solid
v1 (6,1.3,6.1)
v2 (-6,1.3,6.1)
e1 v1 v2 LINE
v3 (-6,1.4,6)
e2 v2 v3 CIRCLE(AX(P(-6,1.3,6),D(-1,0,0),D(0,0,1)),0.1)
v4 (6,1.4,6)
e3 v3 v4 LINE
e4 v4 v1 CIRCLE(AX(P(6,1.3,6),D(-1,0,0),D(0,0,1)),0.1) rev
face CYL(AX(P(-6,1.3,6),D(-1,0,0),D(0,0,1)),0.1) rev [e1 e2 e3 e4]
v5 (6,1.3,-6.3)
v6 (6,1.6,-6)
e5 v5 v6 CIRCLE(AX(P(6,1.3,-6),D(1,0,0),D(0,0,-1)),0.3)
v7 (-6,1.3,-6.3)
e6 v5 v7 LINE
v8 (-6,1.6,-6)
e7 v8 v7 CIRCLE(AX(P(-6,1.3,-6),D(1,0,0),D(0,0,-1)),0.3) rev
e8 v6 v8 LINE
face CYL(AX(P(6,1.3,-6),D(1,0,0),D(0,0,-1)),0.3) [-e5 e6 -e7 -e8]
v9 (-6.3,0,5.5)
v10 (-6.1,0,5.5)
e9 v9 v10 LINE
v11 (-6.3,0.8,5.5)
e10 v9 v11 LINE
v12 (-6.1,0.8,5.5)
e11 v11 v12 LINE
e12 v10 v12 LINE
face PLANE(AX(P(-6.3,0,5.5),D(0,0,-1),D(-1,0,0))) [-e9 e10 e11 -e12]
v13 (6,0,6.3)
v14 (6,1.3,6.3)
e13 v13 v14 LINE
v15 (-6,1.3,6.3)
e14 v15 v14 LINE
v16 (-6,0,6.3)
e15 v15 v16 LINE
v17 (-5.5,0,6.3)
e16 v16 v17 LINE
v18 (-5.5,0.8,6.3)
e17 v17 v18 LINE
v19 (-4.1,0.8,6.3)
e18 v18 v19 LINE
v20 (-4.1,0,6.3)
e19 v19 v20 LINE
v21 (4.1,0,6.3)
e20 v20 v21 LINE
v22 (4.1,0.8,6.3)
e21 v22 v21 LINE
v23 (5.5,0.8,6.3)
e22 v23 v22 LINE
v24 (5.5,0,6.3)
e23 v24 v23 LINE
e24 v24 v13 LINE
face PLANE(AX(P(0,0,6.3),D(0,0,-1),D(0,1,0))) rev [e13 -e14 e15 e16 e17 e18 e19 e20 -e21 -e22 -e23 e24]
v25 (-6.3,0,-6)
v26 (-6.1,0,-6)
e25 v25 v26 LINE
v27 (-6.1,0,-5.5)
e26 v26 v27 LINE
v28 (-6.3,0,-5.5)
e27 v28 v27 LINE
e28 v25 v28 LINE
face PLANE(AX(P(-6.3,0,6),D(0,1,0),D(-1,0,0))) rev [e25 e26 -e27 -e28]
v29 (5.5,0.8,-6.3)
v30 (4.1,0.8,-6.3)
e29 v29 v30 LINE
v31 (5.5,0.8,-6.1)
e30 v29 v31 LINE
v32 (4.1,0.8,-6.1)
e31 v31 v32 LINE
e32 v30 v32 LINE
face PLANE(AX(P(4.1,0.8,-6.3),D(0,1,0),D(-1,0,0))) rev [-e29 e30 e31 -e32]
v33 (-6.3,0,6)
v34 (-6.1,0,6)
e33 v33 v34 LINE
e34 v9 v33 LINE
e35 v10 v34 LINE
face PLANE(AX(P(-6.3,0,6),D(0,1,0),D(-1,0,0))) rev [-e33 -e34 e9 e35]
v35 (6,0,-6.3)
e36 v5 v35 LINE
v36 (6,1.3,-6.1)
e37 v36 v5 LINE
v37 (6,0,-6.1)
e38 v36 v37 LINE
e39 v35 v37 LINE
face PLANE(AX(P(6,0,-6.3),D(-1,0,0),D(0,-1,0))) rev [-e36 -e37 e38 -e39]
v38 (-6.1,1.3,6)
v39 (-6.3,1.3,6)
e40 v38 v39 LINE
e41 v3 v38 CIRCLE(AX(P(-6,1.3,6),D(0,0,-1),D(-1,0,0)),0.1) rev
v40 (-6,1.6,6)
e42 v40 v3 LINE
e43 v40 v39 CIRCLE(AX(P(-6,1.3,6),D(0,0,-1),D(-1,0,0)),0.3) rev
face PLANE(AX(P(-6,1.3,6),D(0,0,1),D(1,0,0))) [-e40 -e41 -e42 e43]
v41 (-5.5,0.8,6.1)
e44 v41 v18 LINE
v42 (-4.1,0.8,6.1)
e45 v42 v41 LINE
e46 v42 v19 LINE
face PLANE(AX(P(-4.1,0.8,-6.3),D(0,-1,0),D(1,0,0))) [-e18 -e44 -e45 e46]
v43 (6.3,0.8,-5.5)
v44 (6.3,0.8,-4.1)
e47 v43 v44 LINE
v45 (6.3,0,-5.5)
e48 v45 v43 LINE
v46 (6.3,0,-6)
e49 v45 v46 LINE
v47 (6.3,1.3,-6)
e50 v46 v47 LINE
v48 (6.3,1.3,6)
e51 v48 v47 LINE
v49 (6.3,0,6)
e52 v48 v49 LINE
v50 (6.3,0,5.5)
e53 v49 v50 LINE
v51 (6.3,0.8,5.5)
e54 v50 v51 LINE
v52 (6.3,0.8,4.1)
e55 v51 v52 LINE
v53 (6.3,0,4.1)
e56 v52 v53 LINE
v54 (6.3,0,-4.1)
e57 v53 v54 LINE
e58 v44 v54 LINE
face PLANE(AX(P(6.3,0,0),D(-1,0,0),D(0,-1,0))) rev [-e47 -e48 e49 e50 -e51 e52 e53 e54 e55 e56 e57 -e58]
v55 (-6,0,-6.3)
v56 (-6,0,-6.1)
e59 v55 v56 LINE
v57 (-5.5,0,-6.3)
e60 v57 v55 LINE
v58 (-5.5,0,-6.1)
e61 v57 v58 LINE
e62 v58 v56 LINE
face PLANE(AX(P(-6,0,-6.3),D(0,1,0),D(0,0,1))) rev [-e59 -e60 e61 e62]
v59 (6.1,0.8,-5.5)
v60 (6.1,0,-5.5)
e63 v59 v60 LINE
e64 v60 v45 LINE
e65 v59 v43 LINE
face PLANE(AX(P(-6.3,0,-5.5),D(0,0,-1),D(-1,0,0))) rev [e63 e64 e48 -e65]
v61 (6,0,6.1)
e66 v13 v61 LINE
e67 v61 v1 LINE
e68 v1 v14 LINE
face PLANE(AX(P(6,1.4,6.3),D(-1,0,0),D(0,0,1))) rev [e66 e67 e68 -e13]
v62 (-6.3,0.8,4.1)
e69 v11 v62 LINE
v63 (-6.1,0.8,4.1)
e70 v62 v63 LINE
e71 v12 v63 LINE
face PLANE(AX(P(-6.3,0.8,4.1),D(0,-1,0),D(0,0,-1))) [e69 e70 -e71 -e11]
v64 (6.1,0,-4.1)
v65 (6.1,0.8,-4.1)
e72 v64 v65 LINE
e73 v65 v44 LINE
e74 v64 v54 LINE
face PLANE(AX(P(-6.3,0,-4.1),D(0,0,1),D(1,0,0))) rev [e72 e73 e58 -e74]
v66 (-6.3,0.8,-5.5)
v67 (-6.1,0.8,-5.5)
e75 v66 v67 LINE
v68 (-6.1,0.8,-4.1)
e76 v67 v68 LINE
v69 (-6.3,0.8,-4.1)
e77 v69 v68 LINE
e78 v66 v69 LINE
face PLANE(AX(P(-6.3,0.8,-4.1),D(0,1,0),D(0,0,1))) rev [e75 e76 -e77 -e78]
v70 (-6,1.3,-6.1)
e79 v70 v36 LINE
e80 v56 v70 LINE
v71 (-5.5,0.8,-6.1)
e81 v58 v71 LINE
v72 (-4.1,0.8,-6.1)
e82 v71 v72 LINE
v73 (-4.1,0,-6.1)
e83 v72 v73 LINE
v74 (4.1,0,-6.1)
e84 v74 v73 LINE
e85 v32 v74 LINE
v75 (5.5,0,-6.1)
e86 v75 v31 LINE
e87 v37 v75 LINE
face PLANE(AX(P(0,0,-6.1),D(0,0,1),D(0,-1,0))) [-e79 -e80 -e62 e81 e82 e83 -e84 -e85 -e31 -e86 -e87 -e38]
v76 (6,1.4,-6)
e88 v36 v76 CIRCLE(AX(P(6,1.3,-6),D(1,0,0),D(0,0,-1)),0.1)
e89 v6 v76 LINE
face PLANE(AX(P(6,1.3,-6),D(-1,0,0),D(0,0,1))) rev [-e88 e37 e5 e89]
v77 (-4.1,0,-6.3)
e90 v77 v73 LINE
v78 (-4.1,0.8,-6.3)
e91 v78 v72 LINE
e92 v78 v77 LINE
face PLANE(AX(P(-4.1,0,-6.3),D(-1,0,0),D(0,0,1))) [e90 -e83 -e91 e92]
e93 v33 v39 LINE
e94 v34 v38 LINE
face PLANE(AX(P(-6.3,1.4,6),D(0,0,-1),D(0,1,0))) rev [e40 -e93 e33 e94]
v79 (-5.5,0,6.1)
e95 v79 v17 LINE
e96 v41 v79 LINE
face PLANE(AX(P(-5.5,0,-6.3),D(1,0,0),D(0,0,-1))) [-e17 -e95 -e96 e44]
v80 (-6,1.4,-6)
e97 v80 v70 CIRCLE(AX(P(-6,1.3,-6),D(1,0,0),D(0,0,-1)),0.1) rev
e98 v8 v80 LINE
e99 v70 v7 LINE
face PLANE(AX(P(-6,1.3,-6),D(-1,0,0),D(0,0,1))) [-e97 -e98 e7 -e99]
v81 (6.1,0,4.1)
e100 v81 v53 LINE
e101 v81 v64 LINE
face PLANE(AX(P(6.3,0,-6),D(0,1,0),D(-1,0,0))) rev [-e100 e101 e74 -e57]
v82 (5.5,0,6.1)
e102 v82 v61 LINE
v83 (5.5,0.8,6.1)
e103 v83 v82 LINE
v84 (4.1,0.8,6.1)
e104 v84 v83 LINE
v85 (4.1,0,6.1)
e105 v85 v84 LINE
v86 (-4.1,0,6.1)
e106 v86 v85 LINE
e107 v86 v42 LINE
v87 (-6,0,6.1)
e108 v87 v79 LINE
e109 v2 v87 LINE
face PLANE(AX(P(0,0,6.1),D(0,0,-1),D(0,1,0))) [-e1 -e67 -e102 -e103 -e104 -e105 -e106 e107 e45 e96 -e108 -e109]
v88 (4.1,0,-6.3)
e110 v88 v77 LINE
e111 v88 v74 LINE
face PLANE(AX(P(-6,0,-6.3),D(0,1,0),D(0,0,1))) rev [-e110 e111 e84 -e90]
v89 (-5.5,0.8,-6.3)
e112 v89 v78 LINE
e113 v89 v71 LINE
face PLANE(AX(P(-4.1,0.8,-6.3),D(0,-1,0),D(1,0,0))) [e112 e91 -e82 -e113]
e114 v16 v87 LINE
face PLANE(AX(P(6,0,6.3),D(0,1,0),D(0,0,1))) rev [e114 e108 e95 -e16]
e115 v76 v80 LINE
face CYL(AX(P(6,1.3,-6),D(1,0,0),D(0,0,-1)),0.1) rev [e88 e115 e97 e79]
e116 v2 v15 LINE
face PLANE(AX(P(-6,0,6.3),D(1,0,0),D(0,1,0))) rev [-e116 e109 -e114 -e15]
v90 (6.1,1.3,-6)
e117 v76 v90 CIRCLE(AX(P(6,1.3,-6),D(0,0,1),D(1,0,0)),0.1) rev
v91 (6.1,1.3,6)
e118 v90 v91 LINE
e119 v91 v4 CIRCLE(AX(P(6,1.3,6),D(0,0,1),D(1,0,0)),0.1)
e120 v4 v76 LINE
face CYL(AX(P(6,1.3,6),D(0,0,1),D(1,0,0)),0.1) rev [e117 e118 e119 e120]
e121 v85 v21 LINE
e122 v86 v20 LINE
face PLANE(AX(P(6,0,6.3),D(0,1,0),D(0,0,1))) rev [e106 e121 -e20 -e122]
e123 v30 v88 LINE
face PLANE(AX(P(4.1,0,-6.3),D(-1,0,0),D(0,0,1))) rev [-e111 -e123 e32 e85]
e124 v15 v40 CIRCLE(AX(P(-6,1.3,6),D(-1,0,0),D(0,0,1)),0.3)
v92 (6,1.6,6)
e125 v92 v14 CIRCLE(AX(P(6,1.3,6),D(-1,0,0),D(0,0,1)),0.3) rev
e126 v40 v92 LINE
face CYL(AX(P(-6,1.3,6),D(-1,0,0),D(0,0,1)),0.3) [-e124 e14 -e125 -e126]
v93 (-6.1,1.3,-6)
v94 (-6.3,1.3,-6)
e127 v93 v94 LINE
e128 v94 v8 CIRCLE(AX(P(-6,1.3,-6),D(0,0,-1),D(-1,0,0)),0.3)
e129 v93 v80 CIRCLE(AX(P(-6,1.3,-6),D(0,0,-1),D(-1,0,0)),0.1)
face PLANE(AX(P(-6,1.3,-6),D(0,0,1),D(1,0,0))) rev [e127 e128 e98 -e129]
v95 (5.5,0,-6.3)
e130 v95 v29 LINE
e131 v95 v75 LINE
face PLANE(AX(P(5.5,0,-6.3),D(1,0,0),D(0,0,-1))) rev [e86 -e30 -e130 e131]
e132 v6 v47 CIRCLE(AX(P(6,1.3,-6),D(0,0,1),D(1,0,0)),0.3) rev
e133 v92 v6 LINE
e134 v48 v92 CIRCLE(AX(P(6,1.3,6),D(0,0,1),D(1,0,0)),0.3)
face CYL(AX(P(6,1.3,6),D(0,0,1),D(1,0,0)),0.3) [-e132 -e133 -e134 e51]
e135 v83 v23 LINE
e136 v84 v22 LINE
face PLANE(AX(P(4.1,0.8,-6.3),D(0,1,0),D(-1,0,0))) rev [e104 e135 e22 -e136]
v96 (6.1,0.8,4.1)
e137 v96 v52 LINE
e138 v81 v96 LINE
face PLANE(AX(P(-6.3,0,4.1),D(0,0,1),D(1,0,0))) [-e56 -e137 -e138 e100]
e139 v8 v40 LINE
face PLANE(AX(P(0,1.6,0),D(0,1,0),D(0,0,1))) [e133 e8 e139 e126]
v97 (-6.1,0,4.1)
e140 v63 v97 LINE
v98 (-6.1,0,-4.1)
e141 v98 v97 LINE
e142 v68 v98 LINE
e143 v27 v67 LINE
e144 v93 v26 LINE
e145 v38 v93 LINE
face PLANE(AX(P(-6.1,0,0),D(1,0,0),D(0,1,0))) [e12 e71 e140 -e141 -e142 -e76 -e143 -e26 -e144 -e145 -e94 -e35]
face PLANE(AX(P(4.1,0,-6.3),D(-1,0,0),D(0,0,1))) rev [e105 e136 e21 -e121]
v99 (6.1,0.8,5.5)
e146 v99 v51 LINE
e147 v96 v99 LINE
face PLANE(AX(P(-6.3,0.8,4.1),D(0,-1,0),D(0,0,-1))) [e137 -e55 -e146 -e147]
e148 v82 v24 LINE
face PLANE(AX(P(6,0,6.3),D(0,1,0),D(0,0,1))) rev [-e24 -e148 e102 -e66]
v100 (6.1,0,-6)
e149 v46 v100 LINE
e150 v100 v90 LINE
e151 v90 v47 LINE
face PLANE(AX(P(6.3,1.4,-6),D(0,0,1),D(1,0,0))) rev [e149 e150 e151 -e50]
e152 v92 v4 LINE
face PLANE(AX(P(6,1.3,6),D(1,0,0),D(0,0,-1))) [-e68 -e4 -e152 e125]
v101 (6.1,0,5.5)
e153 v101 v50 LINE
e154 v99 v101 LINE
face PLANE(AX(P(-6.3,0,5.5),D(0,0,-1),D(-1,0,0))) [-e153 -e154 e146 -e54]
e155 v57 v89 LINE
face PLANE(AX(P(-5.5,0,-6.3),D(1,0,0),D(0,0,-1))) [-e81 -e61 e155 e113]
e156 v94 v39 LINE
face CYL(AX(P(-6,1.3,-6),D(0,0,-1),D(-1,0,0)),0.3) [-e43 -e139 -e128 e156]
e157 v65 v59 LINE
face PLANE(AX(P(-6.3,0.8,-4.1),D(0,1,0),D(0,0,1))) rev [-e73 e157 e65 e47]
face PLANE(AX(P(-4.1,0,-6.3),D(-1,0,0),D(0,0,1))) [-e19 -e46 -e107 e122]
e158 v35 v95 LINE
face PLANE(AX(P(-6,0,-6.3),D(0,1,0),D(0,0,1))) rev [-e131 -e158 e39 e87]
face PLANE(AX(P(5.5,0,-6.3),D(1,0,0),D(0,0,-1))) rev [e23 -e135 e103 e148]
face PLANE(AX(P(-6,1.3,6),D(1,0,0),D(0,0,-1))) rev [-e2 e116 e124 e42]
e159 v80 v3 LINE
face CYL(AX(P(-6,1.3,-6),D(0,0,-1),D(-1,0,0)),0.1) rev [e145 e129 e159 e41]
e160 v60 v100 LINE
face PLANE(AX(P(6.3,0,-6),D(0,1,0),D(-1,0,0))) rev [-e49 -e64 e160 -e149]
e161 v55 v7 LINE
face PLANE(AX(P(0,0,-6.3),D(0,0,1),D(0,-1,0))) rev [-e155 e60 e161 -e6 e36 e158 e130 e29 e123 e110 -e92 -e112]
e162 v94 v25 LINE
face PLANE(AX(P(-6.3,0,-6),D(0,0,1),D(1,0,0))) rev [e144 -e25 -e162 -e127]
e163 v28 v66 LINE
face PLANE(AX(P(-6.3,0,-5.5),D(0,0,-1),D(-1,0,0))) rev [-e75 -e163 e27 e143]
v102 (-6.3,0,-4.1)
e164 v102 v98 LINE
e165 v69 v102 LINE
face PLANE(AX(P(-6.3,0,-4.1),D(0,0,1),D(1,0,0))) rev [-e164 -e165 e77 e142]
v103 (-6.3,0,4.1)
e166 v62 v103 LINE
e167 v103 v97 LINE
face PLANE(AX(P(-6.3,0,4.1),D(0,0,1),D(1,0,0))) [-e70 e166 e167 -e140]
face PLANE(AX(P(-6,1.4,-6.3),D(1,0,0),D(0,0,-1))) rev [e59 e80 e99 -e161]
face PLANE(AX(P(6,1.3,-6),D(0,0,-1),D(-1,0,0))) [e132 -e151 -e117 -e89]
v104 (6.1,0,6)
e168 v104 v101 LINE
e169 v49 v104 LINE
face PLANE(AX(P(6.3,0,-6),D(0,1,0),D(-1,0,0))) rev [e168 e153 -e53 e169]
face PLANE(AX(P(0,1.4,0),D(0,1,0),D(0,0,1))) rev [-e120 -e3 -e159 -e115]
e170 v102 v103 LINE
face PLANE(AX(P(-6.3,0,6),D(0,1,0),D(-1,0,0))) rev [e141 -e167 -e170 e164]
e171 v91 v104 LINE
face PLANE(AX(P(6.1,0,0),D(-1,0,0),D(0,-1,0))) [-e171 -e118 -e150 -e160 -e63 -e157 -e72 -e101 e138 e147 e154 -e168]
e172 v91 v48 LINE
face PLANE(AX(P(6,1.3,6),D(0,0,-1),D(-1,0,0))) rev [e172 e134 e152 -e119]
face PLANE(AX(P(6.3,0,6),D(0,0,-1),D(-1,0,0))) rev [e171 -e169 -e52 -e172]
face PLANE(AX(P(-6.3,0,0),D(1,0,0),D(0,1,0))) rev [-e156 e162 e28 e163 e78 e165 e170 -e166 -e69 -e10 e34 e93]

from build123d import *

# Parameters (mm, degrees)
BASES_W             = 12
BASES_H             = 12
BASE_DEPTH          = 0.2
EDGE_FLANGE1_DEPTH  = 12
EDGE_FLANGE2_DEPTH  = 12
EDGE_FLANGE3_DEPTH  = 12
EDGE_FLANGE4_DEPTH  = 12
VENTS_W             = 1.4
VENTS_H             = 0.8
VENT_DEPTH          = 10.052071586
VCP_COUNT           = 2
VCP_ANGLE           = 90
VCP_COPY_1_SKETCH_W = 1.4
VCP_COPY_1_SKETCH_H = 0.8
VCP_COPY_1_DEPTH    = 10.052071586


# Sheet-metal steps are written as plain solids
with BuildPart() as part:
    # BaseS → Base (new body)
    with BuildSketch(Plane(origin=(0, 1.6, 0), x_dir=(1, 0, 0), z_dir=(0, 1, 0))):
        Rectangle(BASES_W, BASES_H)
    extrude(amount=-BASE_DEPTH)

    # Edge-Flange1 section (across the edge) → Edge-Flange1 (add)
    with BuildSketch(Plane(origin=(6, 1.4, 6.1), x_dir=(0, 0, -1), z_dir=(-1, 0, 0))):
        with BuildLine():
            Line((-0.2, 0.1), (-0.2, 1.4))
            Line((-0.2, 1.4), (0, 1.4))
            Line((0, 1.4), (0, 0.1))
            ThreePointArc((0, 0.1), (0.029289322, 0.029289322), (0.1, 0))
            Line((0.1, 0), (0.1, -0.2))
            ThreePointArc((0.1, -0.2), (-0.112132034, -0.112132034), (-0.2, 0.1))
        make_face()
    extrude(amount=EDGE_FLANGE1_DEPTH)

    # Edge-Flange2 section (across the edge) → Edge-Flange2 (add)
    with BuildSketch(Plane(origin=(-6, 1.4, -6.1), x_dir=(0, 0, 1), z_dir=(1, 0, 0))):
        with BuildLine():
            Line((-0.2, 0.1), (-0.2, 1.4))
            Line((-0.2, 1.4), (0, 1.4))
            Line((0, 1.4), (0, 0.1))
            ThreePointArc((0, 0.1), (0.029289322, 0.029289322), (0.1, 0))
            Line((0.1, 0), (0.1, -0.2))
            ThreePointArc((0.1, -0.2), (-0.112132034, -0.112132034), (-0.2, 0.1))
        make_face()
    extrude(amount=EDGE_FLANGE2_DEPTH)

    # Edge-Flange3 section (across the edge) → Edge-Flange3 (add)
    with BuildSketch(Plane(origin=(6.1, 1.4, -6), x_dir=(-1, 0, 0), z_dir=(0, 0, 1))):
        with BuildLine():
            Line((-0.2, 0.1), (-0.2, 1.4))
            Line((-0.2, 1.4), (0, 1.4))
            Line((0, 1.4), (0, 0.1))
            ThreePointArc((0, 0.1), (0.029289322, 0.029289322), (0.1, 0))
            Line((0.1, 0), (0.1, -0.2))
            ThreePointArc((0.1, -0.2), (-0.112132034, -0.112132034), (-0.2, 0.1))
        make_face()
    extrude(amount=EDGE_FLANGE3_DEPTH)

    # Edge-Flange4 section (across the edge) → Edge-Flange4 (add)
    with BuildSketch(Plane(origin=(-6.1, 1.4, 6), x_dir=(1, 0, 0), z_dir=(0, 0, -1))):
        with BuildLine():
            Line((-0.2, 0.1), (-0.2, 1.4))
            Line((-0.2, 1.4), (0, 1.4))
            Line((0, 1.4), (0, 0.1))
            ThreePointArc((0, 0.1), (0.029289322, 0.029289322), (0.1, 0))
            Line((0.1, 0), (0.1, -0.2))
            ThreePointArc((0.1, -0.2), (-0.112132034, -0.112132034), (-0.2, 0.1))
        make_face()
    extrude(amount=EDGE_FLANGE4_DEPTH)

    # VentS → Vent (cut, symmetric)
    with BuildSketch(Plane(origin=(0, 0, 0), x_dir=(0, 0, -1), z_dir=(1, 0, 0))):
        with Locations((4.8, 0.4)):
            Rectangle(VENTS_W, VENTS_H)
    vent = extrude(amount=VENT_DEPTH, both=True, mode=Mode.SUBTRACT)

    # VHM: Vent across plane
    add(vent.mirror(Plane.XY), mode=Mode.SUBTRACT)

    # VCP: Vent ×2 about axis
    vcp_axis = Axis((0, 1.68, 0), (0, -1, 0))
    for i in range(1, VCP_COUNT):
        add(vent.rotate(vcp_axis, i * VCP_ANGLE / (VCP_COUNT - 1)), mode=Mode.SUBTRACT)

    # VCP copy 1 sketch → VCP copy 1 (cut, symmetric)
    with BuildSketch(Plane(origin=(0, 0, 0), x_dir=(-1, 0, 0), z_dir=(0, 0, 1))):
        with Locations((4.8, -0.4)):
            Rectangle(VCP_COPY_1_SKETCH_W, VCP_COPY_1_SKETCH_H)
    extrude(amount=VCP_COPY_1_DEPTH, both=True, mode=Mode.SUBTRACT)


solid = part.part
